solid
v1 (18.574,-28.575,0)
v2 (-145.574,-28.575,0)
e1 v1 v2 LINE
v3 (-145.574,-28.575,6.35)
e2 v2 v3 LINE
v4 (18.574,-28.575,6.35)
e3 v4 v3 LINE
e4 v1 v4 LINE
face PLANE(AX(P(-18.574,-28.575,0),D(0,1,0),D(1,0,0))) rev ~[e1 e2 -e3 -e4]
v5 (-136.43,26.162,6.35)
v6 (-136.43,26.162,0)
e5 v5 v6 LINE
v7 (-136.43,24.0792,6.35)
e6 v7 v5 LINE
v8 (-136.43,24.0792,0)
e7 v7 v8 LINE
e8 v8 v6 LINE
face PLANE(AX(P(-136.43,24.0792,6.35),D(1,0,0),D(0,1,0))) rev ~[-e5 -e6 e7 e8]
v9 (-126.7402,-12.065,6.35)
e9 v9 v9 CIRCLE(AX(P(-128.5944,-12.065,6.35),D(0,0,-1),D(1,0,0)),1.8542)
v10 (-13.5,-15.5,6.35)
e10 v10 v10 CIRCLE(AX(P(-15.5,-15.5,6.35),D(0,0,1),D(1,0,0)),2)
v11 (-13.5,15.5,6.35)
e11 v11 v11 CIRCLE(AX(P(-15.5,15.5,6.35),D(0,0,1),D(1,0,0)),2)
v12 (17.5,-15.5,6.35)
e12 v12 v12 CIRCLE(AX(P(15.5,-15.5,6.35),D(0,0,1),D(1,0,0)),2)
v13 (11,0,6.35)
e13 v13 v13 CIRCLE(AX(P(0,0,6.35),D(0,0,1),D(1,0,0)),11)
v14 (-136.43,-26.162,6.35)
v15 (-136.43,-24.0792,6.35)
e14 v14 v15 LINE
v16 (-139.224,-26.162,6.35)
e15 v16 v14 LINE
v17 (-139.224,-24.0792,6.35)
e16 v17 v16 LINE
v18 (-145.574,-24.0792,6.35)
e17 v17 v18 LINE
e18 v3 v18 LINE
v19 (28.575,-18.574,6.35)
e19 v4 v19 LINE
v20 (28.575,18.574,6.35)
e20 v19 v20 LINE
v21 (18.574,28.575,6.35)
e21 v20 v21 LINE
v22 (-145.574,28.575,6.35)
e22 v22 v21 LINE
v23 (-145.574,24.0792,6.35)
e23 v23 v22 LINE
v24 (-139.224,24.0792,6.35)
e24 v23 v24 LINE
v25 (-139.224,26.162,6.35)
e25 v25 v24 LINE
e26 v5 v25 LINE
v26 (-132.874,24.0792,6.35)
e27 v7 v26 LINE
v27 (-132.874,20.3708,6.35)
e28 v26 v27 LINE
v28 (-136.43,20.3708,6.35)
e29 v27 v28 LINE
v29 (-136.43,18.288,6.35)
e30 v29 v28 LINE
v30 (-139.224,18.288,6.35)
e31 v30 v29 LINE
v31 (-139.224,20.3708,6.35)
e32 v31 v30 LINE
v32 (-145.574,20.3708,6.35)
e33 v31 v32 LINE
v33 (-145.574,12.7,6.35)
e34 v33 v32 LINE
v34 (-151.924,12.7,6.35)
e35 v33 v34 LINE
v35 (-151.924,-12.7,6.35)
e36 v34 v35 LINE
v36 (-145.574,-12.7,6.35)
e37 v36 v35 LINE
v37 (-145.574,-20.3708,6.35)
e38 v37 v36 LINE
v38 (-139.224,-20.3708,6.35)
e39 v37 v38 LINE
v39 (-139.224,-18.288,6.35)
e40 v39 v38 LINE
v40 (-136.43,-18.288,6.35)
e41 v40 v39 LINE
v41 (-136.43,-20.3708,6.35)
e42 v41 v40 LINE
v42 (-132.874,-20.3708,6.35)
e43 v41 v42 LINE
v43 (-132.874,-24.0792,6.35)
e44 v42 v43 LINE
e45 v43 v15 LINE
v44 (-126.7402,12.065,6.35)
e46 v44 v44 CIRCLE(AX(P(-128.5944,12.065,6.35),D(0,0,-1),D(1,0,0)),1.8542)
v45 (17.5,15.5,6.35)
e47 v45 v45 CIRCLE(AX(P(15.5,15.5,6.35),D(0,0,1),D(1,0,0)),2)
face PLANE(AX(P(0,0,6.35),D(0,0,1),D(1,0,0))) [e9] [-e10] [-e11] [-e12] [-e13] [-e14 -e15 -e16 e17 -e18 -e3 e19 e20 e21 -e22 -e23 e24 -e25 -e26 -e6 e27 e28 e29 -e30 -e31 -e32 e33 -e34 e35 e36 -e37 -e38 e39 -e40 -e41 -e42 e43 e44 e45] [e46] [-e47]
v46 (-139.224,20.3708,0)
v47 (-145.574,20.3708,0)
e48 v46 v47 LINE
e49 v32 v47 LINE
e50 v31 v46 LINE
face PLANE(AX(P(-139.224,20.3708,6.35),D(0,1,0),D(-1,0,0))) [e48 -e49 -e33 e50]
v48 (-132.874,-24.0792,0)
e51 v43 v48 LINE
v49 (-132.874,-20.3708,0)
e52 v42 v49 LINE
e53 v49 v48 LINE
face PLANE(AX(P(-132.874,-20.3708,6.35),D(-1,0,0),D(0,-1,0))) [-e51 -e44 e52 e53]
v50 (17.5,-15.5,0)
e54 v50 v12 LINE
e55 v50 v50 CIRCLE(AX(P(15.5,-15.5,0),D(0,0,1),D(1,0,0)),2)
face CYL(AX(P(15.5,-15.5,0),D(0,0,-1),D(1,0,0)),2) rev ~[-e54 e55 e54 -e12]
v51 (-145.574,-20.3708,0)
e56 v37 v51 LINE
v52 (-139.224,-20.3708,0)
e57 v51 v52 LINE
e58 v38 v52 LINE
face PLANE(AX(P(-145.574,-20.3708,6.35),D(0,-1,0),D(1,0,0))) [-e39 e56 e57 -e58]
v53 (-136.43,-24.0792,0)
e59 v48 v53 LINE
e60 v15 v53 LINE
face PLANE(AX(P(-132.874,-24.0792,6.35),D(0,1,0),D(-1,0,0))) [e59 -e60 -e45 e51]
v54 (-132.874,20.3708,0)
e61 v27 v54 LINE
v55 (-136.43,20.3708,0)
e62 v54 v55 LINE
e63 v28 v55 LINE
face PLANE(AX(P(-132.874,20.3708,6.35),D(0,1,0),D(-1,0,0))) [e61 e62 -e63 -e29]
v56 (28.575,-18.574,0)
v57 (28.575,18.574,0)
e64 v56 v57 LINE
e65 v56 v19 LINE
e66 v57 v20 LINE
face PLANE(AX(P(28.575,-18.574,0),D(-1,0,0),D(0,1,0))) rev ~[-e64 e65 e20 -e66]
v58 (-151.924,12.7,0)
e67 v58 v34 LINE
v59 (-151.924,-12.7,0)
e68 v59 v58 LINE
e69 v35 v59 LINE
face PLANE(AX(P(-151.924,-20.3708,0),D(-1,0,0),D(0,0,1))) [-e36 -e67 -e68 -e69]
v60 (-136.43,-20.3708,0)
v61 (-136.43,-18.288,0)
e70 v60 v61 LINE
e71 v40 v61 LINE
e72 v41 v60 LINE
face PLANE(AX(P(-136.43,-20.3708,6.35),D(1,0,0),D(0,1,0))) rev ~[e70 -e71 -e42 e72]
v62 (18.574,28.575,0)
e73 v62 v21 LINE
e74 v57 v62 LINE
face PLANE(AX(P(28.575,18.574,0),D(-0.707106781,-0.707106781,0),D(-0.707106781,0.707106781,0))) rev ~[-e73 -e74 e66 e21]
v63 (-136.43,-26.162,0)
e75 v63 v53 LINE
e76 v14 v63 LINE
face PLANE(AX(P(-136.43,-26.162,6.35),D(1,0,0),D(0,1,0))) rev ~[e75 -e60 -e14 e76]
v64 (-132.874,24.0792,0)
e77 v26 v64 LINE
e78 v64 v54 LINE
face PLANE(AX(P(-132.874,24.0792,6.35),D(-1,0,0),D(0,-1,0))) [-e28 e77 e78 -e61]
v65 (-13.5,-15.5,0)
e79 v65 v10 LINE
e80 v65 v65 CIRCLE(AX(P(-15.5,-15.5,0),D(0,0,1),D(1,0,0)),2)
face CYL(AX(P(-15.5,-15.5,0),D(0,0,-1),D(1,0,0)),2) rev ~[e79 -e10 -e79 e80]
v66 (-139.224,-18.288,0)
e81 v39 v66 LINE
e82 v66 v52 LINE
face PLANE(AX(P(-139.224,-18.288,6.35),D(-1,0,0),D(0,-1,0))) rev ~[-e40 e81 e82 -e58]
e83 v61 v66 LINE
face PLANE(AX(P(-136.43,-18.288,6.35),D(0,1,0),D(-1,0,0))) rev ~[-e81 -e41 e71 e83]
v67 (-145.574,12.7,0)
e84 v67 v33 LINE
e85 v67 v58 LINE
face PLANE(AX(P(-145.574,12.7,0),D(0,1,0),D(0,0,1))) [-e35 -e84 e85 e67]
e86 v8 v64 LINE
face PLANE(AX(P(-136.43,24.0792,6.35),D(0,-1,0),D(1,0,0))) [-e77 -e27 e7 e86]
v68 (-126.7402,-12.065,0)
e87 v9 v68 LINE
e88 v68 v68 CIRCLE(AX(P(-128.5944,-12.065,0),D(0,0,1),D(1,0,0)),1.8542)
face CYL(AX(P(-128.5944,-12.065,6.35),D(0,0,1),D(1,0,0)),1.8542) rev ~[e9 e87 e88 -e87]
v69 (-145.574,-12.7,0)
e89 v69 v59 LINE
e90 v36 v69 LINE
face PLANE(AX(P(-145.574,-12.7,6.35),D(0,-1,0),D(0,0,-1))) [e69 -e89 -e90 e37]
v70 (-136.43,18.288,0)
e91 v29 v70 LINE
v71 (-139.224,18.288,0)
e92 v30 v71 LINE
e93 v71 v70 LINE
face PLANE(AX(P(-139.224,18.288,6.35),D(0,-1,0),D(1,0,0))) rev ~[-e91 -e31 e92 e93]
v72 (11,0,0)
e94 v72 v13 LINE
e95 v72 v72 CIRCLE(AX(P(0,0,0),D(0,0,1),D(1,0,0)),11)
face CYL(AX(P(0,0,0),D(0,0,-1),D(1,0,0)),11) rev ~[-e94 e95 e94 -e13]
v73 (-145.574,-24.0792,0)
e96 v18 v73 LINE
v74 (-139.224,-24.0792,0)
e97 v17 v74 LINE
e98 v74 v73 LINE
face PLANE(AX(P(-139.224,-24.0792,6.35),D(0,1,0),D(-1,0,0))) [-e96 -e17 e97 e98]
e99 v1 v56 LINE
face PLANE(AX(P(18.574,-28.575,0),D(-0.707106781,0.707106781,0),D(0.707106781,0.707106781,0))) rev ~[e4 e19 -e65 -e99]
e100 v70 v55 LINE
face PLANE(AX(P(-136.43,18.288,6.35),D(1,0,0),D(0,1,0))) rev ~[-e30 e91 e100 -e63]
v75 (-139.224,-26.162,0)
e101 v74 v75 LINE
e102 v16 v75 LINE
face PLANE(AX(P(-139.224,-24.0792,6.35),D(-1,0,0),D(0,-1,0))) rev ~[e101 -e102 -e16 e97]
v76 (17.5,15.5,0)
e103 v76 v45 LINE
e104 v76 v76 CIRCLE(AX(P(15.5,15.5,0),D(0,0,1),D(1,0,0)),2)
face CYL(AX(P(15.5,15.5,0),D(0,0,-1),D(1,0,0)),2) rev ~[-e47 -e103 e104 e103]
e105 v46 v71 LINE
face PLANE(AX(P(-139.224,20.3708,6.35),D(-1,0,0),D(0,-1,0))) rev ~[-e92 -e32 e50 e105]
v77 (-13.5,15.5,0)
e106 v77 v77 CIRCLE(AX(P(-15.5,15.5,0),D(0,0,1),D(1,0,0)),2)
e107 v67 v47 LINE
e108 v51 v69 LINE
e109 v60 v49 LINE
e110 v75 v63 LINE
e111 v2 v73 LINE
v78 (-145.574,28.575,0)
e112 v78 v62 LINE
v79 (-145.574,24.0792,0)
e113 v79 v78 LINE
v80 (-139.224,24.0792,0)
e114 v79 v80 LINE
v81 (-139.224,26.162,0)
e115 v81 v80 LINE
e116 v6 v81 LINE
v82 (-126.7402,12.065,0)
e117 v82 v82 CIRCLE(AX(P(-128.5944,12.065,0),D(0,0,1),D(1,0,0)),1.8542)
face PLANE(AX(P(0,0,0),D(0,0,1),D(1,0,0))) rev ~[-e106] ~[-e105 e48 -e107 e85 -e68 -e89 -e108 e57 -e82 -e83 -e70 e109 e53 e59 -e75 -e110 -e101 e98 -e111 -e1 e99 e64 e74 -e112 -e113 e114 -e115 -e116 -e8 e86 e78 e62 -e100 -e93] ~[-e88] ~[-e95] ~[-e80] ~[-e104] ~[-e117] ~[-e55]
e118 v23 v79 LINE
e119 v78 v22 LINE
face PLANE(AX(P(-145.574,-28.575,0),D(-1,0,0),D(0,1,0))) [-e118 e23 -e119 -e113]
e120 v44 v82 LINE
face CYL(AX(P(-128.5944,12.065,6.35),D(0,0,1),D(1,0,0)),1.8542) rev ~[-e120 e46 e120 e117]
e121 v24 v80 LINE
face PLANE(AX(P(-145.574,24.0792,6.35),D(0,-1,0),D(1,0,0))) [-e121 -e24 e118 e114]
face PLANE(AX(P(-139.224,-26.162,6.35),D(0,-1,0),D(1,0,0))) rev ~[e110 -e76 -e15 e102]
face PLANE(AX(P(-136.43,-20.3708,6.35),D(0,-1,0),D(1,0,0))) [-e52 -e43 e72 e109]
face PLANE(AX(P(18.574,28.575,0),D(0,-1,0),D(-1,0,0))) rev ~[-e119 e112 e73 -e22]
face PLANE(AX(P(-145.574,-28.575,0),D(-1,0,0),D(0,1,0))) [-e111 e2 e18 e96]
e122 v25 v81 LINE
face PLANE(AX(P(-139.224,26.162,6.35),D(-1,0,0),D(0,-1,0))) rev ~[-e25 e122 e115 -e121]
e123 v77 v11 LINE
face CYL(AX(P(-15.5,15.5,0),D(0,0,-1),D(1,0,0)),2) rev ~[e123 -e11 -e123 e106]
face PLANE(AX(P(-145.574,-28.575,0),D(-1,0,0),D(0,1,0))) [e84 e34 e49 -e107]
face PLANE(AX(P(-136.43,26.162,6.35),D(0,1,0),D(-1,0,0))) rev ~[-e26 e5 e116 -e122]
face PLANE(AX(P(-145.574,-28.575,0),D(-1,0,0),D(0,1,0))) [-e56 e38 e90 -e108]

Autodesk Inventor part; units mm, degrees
ref_plane "YZ Plane" through (0, 0, 0) normal (1, 0, 0) x (0, 1, 0)
ref_plane "XZ Plane" through (0, 0, 0) normal (0, 1, 0) x (-1, 0, 0)
ref_plane "XY Plane" through (0, 0, 0) normal (0, 0, 1) x (1, 0, 0)
sketch "Sketch1" plane through (0, 0, 0) normal (0, 0, 1) x (1, 0, 0)
  circle A0 centre (15.5, -15.5) radius 2 projected
  circle A1 centre (-15.5, -15.5) radius 2 projected
  circle A2 centre (15.5, 15.5) radius 2 projected
  circle A3 centre (-15.5, 15.5) radius 2 projected
  line L0 (-21.15, 15.4985) -> (-15.4985, 21.15) projected
  line L1 (-15.4985, 21.15) -> (15.4985, 21.15) projected
  line L2 (15.4985, 21.15) -> (21.15, 15.4985) projected
  line L3 (21.15, 15.4985) -> (21.15, -15.4985) projected
  line L4 (21.15, -15.4985) -> (15.4985, -21.15) projected
  line L5 (15.4985, -21.15) -> (-15.4985, -21.15) projected
  line L6 (-15.4985, -21.15) -> (-21.15, -15.4985) projected
  line L7 (-21.15, -15.4985) -> (-21.15, 15.4985) projected
  line L8 (28.575, -18.574) -> (28.575, 18.574)
  line L9 (28.575, 18.574) -> (18.574, 28.575)
  line L10 (18.574, 28.575) -> (-18.574, 28.575)
  line L11 (-18.574, 28.575) -> (-28.575, 18.574)
  line L12 (-28.575, 18.574) -> (-28.575, -18.574)
  line L13 (-28.575, -18.574) -> (-18.574, -28.575)
  line L14 (-18.574, -28.575) -> (18.574, -28.575)
  line L15 (18.574, -28.575) -> (28.575, -18.574)
  line L16 (-18.574, -28.575) -> (-145.574, -28.575)
  line L17 (-145.574, -28.575) -> (-145.574, 28.575)
  line L18 (-145.574, 28.575) -> (-18.574, 28.575)
  line L19 (-18.574, 28.575) -> (-18.574, -28.575)
  circle A4 centre (0, 0) radius 11 projected
  dimension "d0" = 127
  dimension "d1" = 57.15
  dimension "d2" = 57.15
extrude "Extrusion1" add sketch "Sketch1" along normal blind 6.35
sketch "Sketch2" plane through (0, 0, 6.35) normal (0, 0, 1) x (1, 0, 0)
  line L0 (-130.4486, -16.3493) -> (-130.4486, -9.9993) projected
  line L1 (-126.7402, -9.9993) -> (-126.7402, -16.3493) projected
  line L2 (-130.4486, 9.0507) -> (-130.4486, 15.4007) projected
  line L3 (-126.7402, 15.4007) -> (-126.7402, 9.0507) projected
  line L4 (-126.7402, 12.7) -> (-130.4486, 12.7) construction
  line L5 (-126.7402, -12.7) -> (-130.9009, -12.7) construction
  circle A0 centre (-128.5944, 12.065) radius 1.8542 projected
  circle A1 centre (-128.5944, -12.065) radius 1.8542 projected
extrude "Extrusion2" cut sketch "Sketch2" against normal through all
sketch "Sketch3" plane through (0, 0, 6.35) normal (0, 0, 1) x (1, 0, 0)
  line L0 (-145.574, -28.575) -> (-145.574, 28.575) projected
  line L1 (-151.924, 20.3708) -> (-151.924, 24.0792) projected
  line L2 (-151.924, -24.5535) -> (-151.924, -20.8451) projected
  line L3 (-131.1543, 22.225) -> (-145.574, 22.225) construction
  line L4 (-131.1543, -22.225) -> (-145.574, -22.225) construction
  line L5 (-145.574, -20.3708) -> (-132.874, -20.3708)
  line L6 (-132.874, -20.3708) -> (-132.874, -24.0792)
  line L7 (-132.874, -24.0792) -> (-145.574, -24.0792)
  line L8 (-145.574, -24.0792) -> (-145.574, -20.3708)
  line L9 (-145.574, 24.0792) -> (-132.874, 24.0792)
  line L10 (-132.874, 24.0792) -> (-132.874, 20.3708)
  line L11 (-132.874, 20.3708) -> (-145.574, 20.3708)
  line L12 (-145.574, 20.3708) -> (-145.574, 24.0792)
  line L13 (-136.43, 26.162) -> (-139.224, 26.162)
  line L14 (-139.224, 26.162) -> (-139.224, 18.288)
  line L15 (-139.224, 18.288) -> (-136.43, 18.288)
  line L16 (-136.43, 18.288) -> (-136.43, 26.162)
  line L17 (-136.43, -18.288) -> (-139.224, -18.288)
  line L18 (-139.224, -18.288) -> (-139.224, -26.162)
  line L19 (-139.224, -26.162) -> (-136.43, -26.162)
  line L20 (-136.43, -26.162) -> (-136.43, -18.288)
  dimension "d9" = 12.7
  dimension "d10" = 2.794
  dimension "d11" = 7.874
  dimension "d12" = 3.937
  dimension "d13" = 3.937
  dimension "d14" = 7.874
  dimension "d15" = 3.937
  dimension "d16" = 3.937
  dimension "d17" = 6.35
  dimension "d18" = 6.35
  dimension "d19" = 2.794
extrude "Extrusion3" cut sketch "Sketch3" against normal through all
sketch "Sketch4" plane through (-145.574, -20.3708, 0) normal (-1, 0, 0) x (0, 0, 1)
  line L0 (6.35, 33.0708) -> (6.35, 7.6708) projected
  line L1 (6.35, 7.6708) -> (0, 7.6708) projected
  line L2 (0, 7.6708) -> (0, 33.0708) projected
  line L3 (0, 33.0708) -> (6.35, 33.0708) projected
  point P0 (0, 20.3708)
extrude "Extrusion4" add sketch "Sketch4" along normal blind 6.35
equation "\"d2\" = d1"
equation "\"d12\" = d13"
equation "\"d15\" = d16"
properties part number "tiltColumnNonStepperSide02_RB01" material "Titanium"
